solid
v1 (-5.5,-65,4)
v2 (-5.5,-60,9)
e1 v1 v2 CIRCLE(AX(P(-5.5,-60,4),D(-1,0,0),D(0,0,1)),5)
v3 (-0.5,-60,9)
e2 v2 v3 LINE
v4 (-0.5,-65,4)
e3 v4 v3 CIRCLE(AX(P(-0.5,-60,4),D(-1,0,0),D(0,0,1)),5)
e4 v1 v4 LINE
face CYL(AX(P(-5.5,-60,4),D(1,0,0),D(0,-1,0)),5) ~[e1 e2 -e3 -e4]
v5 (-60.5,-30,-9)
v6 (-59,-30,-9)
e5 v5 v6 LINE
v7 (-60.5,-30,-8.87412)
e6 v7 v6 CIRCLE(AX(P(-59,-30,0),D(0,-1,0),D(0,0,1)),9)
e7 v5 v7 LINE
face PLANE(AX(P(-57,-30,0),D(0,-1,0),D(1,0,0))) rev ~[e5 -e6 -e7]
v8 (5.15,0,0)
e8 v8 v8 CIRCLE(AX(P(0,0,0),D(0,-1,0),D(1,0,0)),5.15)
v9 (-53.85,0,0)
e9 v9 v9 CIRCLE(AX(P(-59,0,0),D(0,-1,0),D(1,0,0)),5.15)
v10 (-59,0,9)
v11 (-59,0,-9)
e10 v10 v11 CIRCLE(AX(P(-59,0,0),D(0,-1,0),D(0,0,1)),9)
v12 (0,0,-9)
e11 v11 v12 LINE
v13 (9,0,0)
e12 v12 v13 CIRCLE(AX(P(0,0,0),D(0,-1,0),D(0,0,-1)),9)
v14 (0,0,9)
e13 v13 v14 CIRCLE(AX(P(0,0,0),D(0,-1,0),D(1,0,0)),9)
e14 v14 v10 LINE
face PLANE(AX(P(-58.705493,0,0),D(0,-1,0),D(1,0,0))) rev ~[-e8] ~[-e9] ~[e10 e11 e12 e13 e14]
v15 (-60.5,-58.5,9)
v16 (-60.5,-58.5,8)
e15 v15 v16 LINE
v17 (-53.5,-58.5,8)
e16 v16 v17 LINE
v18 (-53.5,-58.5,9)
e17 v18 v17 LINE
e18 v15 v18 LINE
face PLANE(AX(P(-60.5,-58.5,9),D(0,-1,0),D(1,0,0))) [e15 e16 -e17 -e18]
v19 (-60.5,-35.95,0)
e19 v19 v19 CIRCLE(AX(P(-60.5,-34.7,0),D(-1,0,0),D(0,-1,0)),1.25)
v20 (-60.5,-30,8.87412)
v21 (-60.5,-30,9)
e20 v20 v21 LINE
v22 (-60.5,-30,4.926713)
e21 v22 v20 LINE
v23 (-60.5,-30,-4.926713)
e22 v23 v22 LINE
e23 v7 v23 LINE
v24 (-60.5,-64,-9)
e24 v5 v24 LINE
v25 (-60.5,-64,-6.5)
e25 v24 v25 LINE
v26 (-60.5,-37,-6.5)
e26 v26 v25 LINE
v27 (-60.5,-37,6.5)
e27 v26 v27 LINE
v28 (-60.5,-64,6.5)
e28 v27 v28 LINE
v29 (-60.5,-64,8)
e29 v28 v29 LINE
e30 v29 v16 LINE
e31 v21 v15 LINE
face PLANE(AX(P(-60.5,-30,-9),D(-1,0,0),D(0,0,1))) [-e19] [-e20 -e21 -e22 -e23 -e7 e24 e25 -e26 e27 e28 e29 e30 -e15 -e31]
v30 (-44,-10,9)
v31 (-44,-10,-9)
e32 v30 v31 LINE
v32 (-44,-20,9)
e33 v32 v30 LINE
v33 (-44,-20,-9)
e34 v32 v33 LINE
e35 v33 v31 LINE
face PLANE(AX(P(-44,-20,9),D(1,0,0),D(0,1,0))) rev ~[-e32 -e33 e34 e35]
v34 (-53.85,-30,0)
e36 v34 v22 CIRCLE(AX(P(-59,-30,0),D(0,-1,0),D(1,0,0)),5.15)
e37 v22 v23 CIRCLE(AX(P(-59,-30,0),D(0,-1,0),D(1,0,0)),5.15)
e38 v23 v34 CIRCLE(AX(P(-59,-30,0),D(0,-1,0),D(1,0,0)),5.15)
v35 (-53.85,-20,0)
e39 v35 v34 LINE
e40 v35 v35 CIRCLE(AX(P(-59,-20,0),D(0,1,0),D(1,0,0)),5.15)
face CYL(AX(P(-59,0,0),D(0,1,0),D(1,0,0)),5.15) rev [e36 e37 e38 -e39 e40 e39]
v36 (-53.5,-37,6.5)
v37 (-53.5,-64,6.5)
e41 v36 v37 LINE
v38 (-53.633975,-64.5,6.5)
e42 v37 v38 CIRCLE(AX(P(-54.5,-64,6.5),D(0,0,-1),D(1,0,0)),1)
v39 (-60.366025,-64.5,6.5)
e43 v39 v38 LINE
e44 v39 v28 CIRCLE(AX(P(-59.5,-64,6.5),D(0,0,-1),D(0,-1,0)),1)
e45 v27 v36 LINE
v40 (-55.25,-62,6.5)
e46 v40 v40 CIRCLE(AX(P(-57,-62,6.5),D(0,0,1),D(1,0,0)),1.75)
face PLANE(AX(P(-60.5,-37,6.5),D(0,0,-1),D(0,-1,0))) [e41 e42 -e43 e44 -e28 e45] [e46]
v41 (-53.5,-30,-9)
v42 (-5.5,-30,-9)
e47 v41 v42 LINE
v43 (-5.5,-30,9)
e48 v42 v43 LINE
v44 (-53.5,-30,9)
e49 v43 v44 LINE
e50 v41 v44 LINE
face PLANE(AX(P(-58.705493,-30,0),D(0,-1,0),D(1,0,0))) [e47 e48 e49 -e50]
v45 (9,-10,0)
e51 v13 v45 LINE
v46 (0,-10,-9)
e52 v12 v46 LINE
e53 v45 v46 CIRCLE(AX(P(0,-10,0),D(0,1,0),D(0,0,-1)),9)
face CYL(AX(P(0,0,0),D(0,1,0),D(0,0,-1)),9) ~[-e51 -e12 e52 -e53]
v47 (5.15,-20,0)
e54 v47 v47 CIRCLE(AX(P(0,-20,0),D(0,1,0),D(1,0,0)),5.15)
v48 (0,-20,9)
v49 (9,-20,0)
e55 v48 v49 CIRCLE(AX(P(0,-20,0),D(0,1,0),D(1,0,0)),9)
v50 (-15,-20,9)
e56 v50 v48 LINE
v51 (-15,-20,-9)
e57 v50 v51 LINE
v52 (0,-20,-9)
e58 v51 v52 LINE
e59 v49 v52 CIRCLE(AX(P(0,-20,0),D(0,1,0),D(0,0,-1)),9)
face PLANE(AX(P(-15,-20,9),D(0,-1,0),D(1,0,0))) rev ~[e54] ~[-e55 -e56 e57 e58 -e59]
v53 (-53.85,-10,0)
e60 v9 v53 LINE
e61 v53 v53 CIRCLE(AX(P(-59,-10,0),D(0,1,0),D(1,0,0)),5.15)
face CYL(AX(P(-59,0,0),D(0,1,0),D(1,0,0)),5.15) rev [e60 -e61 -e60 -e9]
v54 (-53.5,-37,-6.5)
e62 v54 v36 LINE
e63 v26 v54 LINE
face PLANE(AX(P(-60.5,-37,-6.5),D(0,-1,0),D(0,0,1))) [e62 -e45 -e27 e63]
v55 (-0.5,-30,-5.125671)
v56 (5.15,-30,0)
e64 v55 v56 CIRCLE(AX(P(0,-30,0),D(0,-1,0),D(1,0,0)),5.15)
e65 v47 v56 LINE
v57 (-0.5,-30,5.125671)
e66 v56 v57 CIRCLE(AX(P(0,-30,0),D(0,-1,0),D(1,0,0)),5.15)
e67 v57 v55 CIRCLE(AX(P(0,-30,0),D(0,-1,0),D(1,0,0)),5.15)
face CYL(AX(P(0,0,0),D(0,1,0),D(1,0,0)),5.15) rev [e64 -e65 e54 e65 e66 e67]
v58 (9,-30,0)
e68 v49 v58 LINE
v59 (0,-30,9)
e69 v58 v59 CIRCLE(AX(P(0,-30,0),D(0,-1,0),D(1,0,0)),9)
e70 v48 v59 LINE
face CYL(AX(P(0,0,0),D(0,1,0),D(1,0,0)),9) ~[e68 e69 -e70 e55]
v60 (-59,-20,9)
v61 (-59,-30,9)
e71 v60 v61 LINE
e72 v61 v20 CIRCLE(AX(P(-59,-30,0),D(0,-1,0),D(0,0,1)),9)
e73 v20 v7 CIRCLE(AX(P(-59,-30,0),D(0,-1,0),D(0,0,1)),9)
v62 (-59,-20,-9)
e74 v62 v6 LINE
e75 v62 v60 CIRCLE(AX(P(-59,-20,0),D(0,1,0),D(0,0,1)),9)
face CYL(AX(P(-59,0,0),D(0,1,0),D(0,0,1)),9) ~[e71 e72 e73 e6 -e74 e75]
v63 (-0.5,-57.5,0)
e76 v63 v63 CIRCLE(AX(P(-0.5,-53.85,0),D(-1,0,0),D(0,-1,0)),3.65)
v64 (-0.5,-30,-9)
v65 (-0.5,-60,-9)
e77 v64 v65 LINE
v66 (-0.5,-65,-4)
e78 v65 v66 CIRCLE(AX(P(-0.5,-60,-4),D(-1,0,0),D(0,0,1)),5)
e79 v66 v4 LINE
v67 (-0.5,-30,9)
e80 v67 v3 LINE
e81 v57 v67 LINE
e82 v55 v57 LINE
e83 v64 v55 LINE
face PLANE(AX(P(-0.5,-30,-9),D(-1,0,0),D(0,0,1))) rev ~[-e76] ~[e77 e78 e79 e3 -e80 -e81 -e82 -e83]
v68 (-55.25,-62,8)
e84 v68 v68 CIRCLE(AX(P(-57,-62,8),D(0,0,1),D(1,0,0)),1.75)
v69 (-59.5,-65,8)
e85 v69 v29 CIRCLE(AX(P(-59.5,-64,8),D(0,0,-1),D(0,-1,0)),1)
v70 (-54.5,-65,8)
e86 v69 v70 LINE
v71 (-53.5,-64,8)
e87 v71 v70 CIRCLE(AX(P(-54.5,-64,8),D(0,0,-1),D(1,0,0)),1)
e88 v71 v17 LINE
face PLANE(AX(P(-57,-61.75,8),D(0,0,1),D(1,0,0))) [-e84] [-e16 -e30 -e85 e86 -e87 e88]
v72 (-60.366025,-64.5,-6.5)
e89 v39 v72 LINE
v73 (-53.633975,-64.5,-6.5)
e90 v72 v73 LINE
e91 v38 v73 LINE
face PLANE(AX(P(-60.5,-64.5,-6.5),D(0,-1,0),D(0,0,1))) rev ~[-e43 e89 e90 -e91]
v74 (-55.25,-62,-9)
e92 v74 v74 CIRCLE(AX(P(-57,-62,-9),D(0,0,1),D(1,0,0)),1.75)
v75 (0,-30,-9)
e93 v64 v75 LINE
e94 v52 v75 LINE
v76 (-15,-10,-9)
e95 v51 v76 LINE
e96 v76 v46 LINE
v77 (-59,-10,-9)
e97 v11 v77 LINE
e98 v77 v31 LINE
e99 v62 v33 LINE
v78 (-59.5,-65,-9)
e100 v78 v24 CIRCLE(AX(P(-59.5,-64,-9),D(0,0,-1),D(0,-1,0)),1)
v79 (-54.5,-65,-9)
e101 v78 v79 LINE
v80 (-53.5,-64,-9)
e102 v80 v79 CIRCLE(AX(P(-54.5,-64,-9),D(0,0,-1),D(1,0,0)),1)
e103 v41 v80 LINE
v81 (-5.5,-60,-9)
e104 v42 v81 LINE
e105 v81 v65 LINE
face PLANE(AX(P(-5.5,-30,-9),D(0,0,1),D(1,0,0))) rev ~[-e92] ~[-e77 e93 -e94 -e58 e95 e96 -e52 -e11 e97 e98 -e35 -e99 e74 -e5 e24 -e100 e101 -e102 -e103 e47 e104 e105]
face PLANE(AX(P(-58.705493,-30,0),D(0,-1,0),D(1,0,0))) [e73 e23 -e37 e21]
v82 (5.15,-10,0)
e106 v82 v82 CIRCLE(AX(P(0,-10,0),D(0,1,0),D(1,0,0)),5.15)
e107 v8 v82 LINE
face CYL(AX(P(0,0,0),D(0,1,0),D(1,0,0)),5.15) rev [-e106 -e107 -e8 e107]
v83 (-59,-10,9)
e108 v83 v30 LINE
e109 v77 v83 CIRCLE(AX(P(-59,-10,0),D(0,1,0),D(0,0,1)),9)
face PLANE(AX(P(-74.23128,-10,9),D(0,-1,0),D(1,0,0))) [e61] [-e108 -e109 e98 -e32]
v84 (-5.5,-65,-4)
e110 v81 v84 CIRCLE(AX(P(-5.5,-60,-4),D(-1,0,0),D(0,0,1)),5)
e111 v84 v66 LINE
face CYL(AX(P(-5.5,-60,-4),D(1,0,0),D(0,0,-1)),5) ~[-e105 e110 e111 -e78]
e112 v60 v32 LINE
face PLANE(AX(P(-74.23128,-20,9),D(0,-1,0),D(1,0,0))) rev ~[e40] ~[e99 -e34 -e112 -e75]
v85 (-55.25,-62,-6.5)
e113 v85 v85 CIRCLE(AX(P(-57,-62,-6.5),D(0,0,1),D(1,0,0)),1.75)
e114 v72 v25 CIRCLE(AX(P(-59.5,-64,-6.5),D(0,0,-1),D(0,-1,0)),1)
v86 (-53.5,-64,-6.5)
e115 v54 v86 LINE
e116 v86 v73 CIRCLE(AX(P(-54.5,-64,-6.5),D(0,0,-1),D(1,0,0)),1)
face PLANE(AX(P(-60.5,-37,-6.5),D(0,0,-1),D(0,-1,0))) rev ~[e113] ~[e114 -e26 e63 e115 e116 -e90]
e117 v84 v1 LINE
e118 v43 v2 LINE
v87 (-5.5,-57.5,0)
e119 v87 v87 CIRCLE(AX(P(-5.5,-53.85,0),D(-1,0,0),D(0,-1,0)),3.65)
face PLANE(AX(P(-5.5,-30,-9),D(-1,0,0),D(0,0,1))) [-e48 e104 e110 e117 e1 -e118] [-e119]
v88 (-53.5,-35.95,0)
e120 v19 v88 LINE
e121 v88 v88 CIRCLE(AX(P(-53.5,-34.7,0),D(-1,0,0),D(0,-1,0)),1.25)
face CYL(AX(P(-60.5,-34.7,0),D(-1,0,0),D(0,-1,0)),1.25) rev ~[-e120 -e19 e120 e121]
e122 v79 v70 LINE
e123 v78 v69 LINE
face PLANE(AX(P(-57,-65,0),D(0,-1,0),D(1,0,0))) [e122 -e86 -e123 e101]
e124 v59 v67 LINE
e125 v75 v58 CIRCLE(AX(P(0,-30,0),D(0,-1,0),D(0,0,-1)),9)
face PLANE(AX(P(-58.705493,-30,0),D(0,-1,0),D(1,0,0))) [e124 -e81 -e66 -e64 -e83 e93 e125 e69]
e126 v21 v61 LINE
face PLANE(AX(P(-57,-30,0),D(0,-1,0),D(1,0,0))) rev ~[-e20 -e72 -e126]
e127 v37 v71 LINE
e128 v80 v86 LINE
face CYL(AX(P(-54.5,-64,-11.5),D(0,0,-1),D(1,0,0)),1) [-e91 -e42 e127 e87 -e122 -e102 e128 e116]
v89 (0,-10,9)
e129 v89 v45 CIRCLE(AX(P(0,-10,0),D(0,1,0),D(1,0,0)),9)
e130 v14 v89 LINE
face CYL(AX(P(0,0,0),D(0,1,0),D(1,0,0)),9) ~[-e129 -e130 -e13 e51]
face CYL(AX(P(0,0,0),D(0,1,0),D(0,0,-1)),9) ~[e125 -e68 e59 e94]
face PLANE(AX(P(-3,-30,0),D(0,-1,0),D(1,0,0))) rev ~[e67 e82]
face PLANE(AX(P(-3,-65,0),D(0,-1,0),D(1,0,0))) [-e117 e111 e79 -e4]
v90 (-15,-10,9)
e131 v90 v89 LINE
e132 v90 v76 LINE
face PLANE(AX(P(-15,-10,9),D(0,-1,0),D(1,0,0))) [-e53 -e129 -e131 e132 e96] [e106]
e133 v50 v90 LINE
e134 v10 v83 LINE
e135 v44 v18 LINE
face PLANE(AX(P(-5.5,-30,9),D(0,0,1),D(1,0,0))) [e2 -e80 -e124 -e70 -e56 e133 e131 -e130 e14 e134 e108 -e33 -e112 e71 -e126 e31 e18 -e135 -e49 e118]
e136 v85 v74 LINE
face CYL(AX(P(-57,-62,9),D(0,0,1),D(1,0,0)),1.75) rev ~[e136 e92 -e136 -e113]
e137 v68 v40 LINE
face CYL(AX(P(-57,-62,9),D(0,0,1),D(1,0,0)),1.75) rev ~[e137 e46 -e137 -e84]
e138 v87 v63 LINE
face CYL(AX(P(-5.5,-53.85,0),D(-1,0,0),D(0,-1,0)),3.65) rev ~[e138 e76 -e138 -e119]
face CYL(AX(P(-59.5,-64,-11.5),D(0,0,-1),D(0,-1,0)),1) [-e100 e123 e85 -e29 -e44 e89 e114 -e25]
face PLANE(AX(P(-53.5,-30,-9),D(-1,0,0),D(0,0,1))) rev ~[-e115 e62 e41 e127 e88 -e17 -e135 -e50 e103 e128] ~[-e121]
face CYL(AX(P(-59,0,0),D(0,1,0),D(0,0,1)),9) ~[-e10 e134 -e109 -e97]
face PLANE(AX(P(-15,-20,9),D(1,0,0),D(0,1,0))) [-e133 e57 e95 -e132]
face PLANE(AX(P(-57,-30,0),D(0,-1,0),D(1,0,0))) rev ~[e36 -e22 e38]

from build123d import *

# Parameters (mm, degrees)
F0_R         = 5.15
F1_DEPTH     = 30
F2_W         = 26.2453191746
F2_H         = 10
F2_W_2       = 30.2312795687
F3_DEPTH     = 25
F4_W         = 5
F4_H         = 18
F4_W_2       = 7
F5_DEPTH     = 35
F6_W         = 27.5
F6_H         = 13
F6_R         = 1.25
F7_DEPTH     = 25
F8_R         = 3.65
F9_DEPTH     = 25
F10_R        = 5
F11_R        = 1.75
F12_DEPTH    = 25
F13_W        = 7
F13_H        = 6.5
F14_DEPTH    = 1
F15_T1_DEPTH = 22


# Not quite as in the source:
# - a fillet or chamfer that OpenCascade refuses, or shapes differently, is made with other operations: its cross-section is extruded or revolved along the edge and cut away or added


with BuildPart() as f1:
    # F0 (on Front) → F1 (new body)
    with BuildSketch(Plane.XZ):
        with BuildLine():
            ThreePointArc((-59, -9), (-52.6360389693, -6.3639610307), (-50, 0))
            ThreePointArc((-50, 0), (-52.6360389693, 6.3639610307), (-59, 9))
            ThreePointArc((-59, 9), (-68, 0), (-59, -9))
        make_face()
        with Locations((-59, 0)):
            Circle(F0_R, mode=Mode.SUBTRACT)
        with BuildLine():
            ThreePointArc((-59, 9), (-52.6360389693, 6.3639610307), (-50, 0))
            ThreePointArc((-50, 0), (-52.6360389693, -6.3639610307), (-59, -9))
            Line((-59, -9), (0, -9))
            ThreePointArc((0, -9), (-9, 0), (0, 9))
            Line((0, 9), (-59, 9))
        make_face()
        with BuildLine():
            ThreePointArc((9, 0), (6.3639610307, 6.3639610307), (0, 9))
            ThreePointArc((0, 9), (-9, 0), (0, -9))
            ThreePointArc((0, -9), (6.3639610307, -6.3639610307), (9, 0))
        make_face()
        Circle(F0_R, mode=Mode.SUBTRACT)
    extrude(amount=F1_DEPTH)

    # F2 (on face) → F3 (cut)
    with BuildSketch(Plane.XY.offset(9)):
        with Locations((-1.8773404127, -15)):
            Rectangle(F2_W, F2_H)
        with Locations((-59.1156397844, -15)):
            Rectangle(F2_W_2, F2_H)
    extrude(amount=-F3_DEPTH, mode=Mode.SUBTRACT)

    # F4 (on face) → F5 (join)
    with BuildSketch(Plane.XZ.offset(30)):
        with Locations((-3, 0)):
            Rectangle(F4_W, F4_H)
        with Locations((-57, 0)):
            Rectangle(F4_W_2, F4_H)
    extrude(amount=F5_DEPTH)

    # F6 (on face) → F7 (cut)
    with BuildSketch(Plane(origin=(-60.5, 0, 0), x_dir=(0, -1, 0), z_dir=(-1, 0, 0))):
        with Locations((50.75, 0)):
            Rectangle(F6_W, F6_H)
        with Locations((34.7, 0)):
            Circle(F6_R)
    extrude(amount=-F7_DEPTH, mode=Mode.SUBTRACT)

    # F8 (on face) → F9 (cut)
    with BuildSketch(Plane(origin=(-5.5, 0, 0), x_dir=(0, -1, 0), z_dir=(-1, 0, 0))):
        with Locations((53.85, 0)):
            Circle(F8_R)
    extrude(amount=-F9_DEPTH, mode=Mode.SUBTRACT)

    # F10
    f10_edges = [f1.edges().sort_by_distance(p)[0] for p in [
        (-3, -65, 9),
        (-3, -65, -9),
    ]]
    fillet(f10_edges, radius=F10_R)

    # F11 (on face) → F12 (cut)
    with BuildSketch(Plane.XY.offset(9)):
        with Locations((-57, -62)):
            Circle(F11_R)
    extrude(amount=-F12_DEPTH, mode=Mode.SUBTRACT)

    # F13 (on face) → F14 (cut)
    with BuildSketch(Plane.XY.offset(9)):
        with Locations((-57, -61.75)):
            Rectangle(F13_W, F13_H)
    extrude(amount=-F14_DEPTH, mode=Mode.SUBTRACT)

    # F15: fillet of radius 1 on 2 edges, made by hand

    # F15_s2 → F15_t1 (cut)
    with BuildSketch(Plane.XY.offset(-11.5)):
        with BuildLine():
            ThreePointArc((-59.5, -65), (-60.2071067812, -64.7071067812), (-60.5, -64))
            Line((-60.5, -64), (-60.5, -65))
            Line((-60.5, -65), (-59.5, -65))
        make_face()
        with BuildLine():
            ThreePointArc((-53.5, -64), (-53.7928932188, -64.7071067812), (-54.5, -65))
            Line((-54.5, -65), (-53.5, -65))
            Line((-53.5, -65), (-53.5, -64))
        make_face()
    extrude(amount=F15_T1_DEPTH, mode=Mode.SUBTRACT)


solid = f1.part
